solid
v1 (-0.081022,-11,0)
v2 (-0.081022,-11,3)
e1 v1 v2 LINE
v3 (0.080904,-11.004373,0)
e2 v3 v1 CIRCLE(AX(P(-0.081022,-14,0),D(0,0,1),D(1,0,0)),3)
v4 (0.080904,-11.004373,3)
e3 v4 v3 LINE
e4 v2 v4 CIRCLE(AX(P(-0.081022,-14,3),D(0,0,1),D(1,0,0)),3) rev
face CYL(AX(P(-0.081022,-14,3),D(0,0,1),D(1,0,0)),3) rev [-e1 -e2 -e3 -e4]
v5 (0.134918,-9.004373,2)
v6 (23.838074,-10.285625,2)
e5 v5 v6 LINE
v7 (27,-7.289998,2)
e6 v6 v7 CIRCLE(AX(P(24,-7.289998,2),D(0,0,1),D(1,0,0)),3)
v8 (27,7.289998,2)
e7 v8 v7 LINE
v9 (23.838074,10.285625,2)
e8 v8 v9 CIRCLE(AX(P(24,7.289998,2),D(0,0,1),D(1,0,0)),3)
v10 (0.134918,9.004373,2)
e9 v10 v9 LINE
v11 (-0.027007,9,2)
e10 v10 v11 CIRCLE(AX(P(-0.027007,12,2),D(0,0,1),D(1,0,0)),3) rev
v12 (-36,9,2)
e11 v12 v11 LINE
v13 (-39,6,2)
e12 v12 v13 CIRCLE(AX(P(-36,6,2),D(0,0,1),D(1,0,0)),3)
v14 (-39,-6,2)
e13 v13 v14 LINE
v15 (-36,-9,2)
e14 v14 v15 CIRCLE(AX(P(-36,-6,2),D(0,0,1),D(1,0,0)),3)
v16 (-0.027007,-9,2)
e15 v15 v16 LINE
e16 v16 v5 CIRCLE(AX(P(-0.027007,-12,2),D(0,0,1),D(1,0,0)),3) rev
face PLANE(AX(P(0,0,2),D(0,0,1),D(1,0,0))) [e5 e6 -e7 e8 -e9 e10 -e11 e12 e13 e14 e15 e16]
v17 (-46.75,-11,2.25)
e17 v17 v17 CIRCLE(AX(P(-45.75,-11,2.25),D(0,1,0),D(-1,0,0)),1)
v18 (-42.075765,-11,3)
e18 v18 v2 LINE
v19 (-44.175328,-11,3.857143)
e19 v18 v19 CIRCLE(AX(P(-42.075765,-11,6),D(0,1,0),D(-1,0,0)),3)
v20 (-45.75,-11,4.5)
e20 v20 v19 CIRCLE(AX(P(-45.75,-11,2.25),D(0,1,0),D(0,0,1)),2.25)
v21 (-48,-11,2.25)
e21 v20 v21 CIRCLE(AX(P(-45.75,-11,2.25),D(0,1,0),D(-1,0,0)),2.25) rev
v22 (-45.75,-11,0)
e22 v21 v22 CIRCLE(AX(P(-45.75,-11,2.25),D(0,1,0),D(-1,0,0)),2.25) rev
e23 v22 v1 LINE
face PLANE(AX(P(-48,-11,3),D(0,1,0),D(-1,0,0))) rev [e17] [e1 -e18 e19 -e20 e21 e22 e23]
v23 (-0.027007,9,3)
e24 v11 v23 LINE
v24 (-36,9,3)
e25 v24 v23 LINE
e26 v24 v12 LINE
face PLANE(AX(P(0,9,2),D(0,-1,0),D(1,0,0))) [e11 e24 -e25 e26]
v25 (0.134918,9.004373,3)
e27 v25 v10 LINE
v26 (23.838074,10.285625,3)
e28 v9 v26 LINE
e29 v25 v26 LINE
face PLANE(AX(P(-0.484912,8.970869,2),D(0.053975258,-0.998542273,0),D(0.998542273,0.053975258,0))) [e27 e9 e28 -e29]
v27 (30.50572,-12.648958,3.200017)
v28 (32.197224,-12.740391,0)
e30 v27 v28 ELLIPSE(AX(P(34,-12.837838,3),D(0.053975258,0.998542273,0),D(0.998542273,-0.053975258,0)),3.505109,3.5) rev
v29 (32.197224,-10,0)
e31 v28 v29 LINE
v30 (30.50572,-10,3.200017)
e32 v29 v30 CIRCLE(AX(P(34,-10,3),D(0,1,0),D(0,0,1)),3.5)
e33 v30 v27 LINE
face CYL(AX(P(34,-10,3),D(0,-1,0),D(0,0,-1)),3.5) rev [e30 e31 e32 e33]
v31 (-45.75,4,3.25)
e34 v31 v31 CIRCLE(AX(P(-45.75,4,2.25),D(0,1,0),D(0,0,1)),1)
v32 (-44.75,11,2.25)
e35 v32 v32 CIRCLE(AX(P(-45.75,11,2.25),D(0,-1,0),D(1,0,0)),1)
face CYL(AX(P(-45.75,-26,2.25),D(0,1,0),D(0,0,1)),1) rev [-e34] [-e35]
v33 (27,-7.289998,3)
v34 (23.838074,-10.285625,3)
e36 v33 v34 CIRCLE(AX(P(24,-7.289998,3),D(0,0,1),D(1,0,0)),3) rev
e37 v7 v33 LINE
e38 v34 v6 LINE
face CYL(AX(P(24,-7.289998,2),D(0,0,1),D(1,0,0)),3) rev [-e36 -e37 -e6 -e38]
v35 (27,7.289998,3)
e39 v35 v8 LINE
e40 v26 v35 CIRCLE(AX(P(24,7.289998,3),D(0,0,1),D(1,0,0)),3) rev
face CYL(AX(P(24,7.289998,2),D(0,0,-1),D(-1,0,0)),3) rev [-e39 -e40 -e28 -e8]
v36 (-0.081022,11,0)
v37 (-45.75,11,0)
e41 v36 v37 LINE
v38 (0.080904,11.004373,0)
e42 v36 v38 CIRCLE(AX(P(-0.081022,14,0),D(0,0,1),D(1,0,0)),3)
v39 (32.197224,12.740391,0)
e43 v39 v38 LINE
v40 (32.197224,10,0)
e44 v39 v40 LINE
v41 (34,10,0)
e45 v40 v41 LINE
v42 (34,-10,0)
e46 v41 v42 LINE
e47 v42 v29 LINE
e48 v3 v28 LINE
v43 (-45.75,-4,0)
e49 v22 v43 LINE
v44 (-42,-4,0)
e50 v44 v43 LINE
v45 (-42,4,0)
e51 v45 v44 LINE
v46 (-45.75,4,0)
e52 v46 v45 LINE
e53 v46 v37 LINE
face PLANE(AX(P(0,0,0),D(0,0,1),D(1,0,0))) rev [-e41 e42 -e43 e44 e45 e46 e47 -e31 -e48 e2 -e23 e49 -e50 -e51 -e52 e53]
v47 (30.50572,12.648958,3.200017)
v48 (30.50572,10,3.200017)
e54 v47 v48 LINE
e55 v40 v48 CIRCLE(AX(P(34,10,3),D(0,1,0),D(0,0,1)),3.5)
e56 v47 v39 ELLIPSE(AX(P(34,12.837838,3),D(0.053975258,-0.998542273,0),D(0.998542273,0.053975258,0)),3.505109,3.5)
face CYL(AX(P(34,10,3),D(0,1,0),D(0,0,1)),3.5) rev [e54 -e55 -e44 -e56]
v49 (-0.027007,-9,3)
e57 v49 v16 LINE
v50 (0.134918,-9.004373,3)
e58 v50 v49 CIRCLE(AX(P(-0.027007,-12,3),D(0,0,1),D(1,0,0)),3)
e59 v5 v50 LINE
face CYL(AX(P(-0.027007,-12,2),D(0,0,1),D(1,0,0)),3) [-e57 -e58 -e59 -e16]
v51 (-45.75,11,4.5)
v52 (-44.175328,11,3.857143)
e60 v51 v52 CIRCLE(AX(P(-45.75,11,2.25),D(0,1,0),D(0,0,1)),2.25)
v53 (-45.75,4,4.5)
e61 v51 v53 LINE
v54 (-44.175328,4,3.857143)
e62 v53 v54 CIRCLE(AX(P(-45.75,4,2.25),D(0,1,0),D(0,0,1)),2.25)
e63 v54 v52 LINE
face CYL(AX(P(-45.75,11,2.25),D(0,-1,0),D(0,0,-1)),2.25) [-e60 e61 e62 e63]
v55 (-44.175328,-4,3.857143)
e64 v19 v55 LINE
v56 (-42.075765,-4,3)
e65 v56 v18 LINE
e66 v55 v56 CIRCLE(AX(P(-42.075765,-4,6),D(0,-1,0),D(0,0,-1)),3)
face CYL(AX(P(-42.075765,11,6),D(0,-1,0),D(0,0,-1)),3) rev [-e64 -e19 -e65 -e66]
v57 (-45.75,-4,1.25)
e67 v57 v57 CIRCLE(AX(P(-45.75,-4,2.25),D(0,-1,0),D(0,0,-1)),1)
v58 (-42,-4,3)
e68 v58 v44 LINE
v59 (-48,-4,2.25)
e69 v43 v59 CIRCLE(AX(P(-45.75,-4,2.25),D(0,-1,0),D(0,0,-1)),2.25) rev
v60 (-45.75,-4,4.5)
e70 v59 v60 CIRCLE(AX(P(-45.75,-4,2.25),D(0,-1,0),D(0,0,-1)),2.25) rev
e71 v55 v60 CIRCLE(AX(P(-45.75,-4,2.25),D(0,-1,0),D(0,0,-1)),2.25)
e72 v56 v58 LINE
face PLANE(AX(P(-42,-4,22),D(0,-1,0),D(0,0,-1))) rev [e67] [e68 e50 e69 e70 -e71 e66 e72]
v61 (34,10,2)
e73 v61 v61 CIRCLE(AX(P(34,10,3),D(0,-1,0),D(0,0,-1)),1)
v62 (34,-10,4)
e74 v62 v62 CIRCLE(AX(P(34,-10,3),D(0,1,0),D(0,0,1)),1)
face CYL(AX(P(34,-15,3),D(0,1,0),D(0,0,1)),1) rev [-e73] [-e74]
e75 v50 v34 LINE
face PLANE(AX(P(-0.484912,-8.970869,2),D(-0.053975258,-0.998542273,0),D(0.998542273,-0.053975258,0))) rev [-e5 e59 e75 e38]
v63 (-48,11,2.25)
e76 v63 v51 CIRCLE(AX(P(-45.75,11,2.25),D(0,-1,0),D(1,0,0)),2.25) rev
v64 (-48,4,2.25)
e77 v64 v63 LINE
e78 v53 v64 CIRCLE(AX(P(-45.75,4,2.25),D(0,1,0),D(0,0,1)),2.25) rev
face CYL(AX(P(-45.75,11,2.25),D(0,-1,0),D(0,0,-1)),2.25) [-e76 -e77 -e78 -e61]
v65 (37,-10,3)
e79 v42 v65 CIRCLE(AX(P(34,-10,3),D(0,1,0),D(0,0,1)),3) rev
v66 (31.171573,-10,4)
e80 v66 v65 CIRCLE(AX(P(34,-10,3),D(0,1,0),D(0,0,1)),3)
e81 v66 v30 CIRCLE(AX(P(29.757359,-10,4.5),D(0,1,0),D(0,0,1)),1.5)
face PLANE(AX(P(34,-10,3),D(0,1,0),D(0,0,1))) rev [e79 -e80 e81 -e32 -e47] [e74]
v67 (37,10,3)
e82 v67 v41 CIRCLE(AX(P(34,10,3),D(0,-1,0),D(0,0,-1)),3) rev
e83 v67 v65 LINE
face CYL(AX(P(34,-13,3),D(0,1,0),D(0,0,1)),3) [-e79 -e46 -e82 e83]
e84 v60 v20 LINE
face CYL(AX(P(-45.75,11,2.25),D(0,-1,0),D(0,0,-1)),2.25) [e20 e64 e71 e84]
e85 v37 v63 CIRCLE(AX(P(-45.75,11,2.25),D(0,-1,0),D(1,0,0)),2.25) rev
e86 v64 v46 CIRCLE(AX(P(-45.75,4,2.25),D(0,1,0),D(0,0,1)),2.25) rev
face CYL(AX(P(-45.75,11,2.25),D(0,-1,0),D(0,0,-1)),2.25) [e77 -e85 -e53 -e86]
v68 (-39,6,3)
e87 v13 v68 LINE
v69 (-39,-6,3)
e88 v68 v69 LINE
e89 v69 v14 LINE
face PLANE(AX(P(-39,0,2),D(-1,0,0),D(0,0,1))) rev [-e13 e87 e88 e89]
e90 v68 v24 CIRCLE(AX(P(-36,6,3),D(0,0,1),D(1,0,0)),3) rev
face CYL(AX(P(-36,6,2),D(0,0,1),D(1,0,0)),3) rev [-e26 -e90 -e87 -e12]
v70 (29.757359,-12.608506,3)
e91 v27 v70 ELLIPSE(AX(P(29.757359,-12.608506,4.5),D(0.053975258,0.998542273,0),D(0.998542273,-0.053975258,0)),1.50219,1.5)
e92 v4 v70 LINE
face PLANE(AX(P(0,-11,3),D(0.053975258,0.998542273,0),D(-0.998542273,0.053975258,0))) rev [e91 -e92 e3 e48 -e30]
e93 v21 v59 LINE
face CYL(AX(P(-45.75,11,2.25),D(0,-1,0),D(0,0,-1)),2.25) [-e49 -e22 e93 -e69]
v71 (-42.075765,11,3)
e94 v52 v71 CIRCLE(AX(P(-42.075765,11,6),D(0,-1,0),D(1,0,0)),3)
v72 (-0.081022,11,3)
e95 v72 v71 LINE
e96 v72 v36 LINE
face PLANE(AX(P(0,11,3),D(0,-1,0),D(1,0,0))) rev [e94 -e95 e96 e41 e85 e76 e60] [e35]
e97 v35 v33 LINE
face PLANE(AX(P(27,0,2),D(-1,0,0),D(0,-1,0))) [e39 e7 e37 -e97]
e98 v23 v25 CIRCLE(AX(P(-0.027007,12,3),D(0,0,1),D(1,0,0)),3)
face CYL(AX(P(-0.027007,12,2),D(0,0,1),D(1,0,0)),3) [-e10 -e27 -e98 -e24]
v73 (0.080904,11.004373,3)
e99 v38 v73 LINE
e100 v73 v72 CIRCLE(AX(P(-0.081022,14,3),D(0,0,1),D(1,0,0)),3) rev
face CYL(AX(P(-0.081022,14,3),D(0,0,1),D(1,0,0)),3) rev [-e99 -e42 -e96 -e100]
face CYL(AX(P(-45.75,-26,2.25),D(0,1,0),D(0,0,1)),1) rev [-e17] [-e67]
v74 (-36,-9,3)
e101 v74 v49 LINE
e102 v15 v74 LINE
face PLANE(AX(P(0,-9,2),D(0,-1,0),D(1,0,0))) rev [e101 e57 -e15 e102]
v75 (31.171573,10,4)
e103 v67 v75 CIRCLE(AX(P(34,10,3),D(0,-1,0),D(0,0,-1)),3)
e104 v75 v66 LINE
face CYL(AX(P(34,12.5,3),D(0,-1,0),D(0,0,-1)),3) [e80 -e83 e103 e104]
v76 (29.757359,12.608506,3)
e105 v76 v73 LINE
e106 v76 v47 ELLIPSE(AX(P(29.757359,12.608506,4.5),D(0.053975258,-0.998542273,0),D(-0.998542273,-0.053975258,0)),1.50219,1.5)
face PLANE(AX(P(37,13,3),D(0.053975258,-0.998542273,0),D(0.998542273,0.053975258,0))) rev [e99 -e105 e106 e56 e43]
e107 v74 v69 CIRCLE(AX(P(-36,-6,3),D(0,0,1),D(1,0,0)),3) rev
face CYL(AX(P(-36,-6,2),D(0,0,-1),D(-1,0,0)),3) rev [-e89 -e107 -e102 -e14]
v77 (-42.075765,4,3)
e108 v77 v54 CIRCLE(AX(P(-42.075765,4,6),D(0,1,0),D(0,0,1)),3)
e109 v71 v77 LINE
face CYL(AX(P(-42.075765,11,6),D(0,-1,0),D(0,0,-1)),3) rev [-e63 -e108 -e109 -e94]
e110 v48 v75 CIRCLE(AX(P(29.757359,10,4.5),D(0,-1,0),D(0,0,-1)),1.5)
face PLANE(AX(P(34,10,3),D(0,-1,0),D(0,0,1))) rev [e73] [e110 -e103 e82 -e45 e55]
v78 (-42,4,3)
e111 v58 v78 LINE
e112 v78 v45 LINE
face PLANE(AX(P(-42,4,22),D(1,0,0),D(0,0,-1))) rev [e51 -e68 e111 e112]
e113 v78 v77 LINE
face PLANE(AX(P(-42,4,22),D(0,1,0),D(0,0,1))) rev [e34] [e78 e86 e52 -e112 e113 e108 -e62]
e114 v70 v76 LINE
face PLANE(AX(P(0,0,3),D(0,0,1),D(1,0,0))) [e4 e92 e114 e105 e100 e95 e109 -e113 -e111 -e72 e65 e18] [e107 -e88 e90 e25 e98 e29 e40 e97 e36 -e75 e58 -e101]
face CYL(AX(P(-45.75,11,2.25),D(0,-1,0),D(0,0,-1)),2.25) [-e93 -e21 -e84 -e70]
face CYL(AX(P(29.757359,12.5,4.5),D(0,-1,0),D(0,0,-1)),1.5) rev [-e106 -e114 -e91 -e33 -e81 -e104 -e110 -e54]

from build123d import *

# Parameters (mm, degrees)
SALIENTE_EXTRUIR1_DEPTH = 3
CORTAR_EXTRUIR1_DEPTH   = 1
CROQUIS8_R              = 3
SALIENTE_EXTRUIR2_DEPTH = 12.5
REDONDEO1_R             = 3
CROQUIS9_R              = 3.5
CORTAR_EXTRUIR3_DEPTH   = 3
REDONDEO2_R             = 1.5
CROQUIS10_R             = 1
CORTAR_EXTRUIR4_DEPTH   = 15
REDONDEO3_R             = 3
SALIENTE_EXTRUIR3_DEPTH = 11
REDONDEO4_R             = 2.25
CROQUIS12_W             = 10
CROQUIS12_H             = 8
CORTAR_EXTRUIR5_DEPTH   = 22
CROQUIS13_R             = 1
CORTAR_EXTRUIR6_DEPTH   = 26
REDONDEO5_R             = 3
REDONDEO6_R             = 3


# Some blends are built 0.0001 mm under size
with BuildPart() as part:
    # Croquis1 → Saliente-Extruir1 (new body)
    with BuildSketch(Plane.XY):
        Polygon((0, 11), (-48, 11), (-48, -11), (0, -11), (37, -13), (37, 13), align=None)
    extrude(amount=SALIENTE_EXTRUIR1_DEPTH)

    # Croquis7 → Cortar-Extruir1 (cut)
    with BuildSketch(Plane.XY.offset(3)):
        Polygon((-39, 9), (-39, -9), (0.054014627, -9), (27, -10.45653975), (27, 10.45653975), (0.054014627, 9), align=None)
    extrude(amount=-CORTAR_EXTRUIR1_DEPTH, mode=Mode.SUBTRACT)

    # Croquis8 → Saliente-Extruir2 (add, symmetric)
    with BuildSketch(Plane(origin=(0, 0, 0), x_dir=(1, 0, 0), z_dir=(0, 1, 0))):
        with Locations((34, -3)):
            Circle(CROQUIS8_R)
    extrude(amount=SALIENTE_EXTRUIR2_DEPTH, both=True)

    # Redondeo1
    redondeo1_edges = [part.edges().sort_by_distance(p)[0] for p in [
        (37, 0, 0),
    ]]
    fillet(redondeo1_edges, radius=REDONDEO1_R - 0.0001)  # a hair under: the kernel refuses the full size

    # Croquis9 → Cortar-Extruir3 (cut)
    with BuildSketch(Plane(origin=(0, -13, 0), x_dir=(1, 0, 0), z_dir=(0, 1, 0))):
        with Locations((34, -3)):
            Circle(CROQUIS9_R)
    cortar_extruir3 = extrude(amount=CORTAR_EXTRUIR3_DEPTH, mode=Mode.SUBTRACT)

    # Simetría1: Cortar-Extruir3 across plane
    add(cortar_extruir3.mirror(Plane.ZX), mode=Mode.SUBTRACT)

    # Redondeo2
    redondeo2_edges = [part.edges().sort_by_distance(p)[0] for p in [
        (31, 0, 3),
    ]]
    fillet(redondeo2_edges, radius=REDONDEO2_R)

    # Croquis10 → Cortar-Extruir4 (cut, symmetric)
    with BuildSketch(Plane(origin=(0, 0, 0), x_dir=(1, 0, 0), z_dir=(0, 1, 0))):
        with Locations(Location((34, -3, 0), (0, 0, 270))):
            Circle(CROQUIS10_R)
    extrude(amount=CORTAR_EXTRUIR4_DEPTH, both=True, mode=Mode.SUBTRACT)

    # Redondeo3
    # the kernel refuses this fillet: 3 mm, written as the material it adds along each edge
    with BuildSketch(Plane(origin=(-39, -9, 3), x_dir=(0, 1, 0), z_dir=(0, 0, -1))) as redondeo3_piece_1:
        with BuildLine():
            CenterArc((REDONDEO3_R, REDONDEO3_R), REDONDEO3_R, 180, 90)
            Line((0, REDONDEO3_R), (0, 0))
            Line((0, 0), (REDONDEO3_R, 0))
        make_face()
    extrude(amount=1)
    with BuildSketch(Plane(origin=(-39, 9, 3), x_dir=(0, -1, 0), z_dir=(0, 0, -1))) as redondeo3_piece_2:
        with BuildLine():
            CenterArc((REDONDEO3_R, -REDONDEO3_R), REDONDEO3_R, 90, 90)
            Line((0, -REDONDEO3_R), (0, 0))
            Line((0, 0), (REDONDEO3_R, 0))
        make_face()
    extrude(amount=1)
    with BuildSketch(Plane(origin=(27, 10.45653975, 3), x_dir=(-0.9985422732775083, -0.053975258015000575, 0), z_dir=(0, 0, -1))) as redondeo3_piece_3:
        with BuildLine():
            CenterArc((REDONDEO3_R * 1.05551390885, -REDONDEO3_R), REDONDEO3_R, 90, 93.094058059)
            Line((REDONDEO3_R * 0.0569716355684, -REDONDEO3_R * 1.05397525801), (0, 0))
            Line((0, 0), (REDONDEO3_R * 1.05551390885, 0))
        make_face()
    extrude(amount=1)
    with BuildSketch(Plane(origin=(27, -10.45653975, 3), x_dir=(-0.9985422732775082, 0.053975258015002685, 0), z_dir=(0, 0, -1))) as redondeo3_piece_4:
        with BuildLine():
            CenterArc((REDONDEO3_R * 1.05551390885, REDONDEO3_R), REDONDEO3_R, 176.905941941, 93.094058059)
            Line((REDONDEO3_R * 0.0569716355684, REDONDEO3_R * 1.05397525802), (0, 0))
            Line((0, 0), (REDONDEO3_R * 1.05551390885, 0))
        make_face()
    extrude(amount=1)
    # the kernel refuses this fillet: 3 mm, written as the material it takes off along each edge
    with BuildSketch(Plane(origin=(0.054014627, 9, 3.202554852), x_dir=(-1, 0, 0), z_dir=(0, 0, -1))) as redondeo3_2_piece_1:
        with BuildLine():
            CenterArc((REDONDEO3_R * 0.0270073136489, REDONDEO3_R), REDONDEO3_R, 266.905941941, 3.094058059)
            Line((-REDONDEO3_R * 0.0269679443661, REDONDEO3_R * 0.00145772672249), (0, 0))
            Line((0, 0), (REDONDEO3_R * 0.0270073136489, 0))
        make_face()
    extrude(amount=1.202554852, mode=Mode.SUBTRACT)
    with BuildSketch(Plane(origin=(0.054014627, -9, 3.202554852), x_dir=(-1, 0, 0), z_dir=(0, 0, -1))) as redondeo3_2_piece_2:
        with BuildLine():
            CenterArc((REDONDEO3_R * 0.0270073136489, -REDONDEO3_R), REDONDEO3_R, 90, 3.094058059)
            Line((-REDONDEO3_R * 0.0269679443661, -REDONDEO3_R * 0.00145772672249), (0, 0))
            Line((0, 0), (REDONDEO3_R * 0.0270073136489, 0))
        make_face()
    extrude(amount=1.202554852, mode=Mode.SUBTRACT)

    # Croquis11 → Saliente-Extruir3 (add, symmetric)
    with BuildSketch(Plane(origin=(0, 0, 0), x_dir=(1, 0, 0), z_dir=(0, 1, 0))):
        with BuildLine():
            Line((-48, -4.5), (-45.75, -4.5))
            ThreePointArc((-45.75, -4.5), (-44.159009742, -3.840990258), (-43.5, -2.25))
            Line((-43.5, -2.25), (-43.5, 0))
            Line((-43.5, 0), (-48, 0))
            Line((-48, 0), (-48, -4.5))
        make_face()
    extrude(amount=SALIENTE_EXTRUIR3_DEPTH, both=True)

    # Redondeo4
    redondeo4_edges = [part.edges().sort_by_distance(p)[0] for p in [
        (-48, 0, 0),
        (-48, 0, 4.5),
    ]]
    fillet(redondeo4_edges, radius=REDONDEO4_R - 0.0001)  # a hair under: the kernel refuses the full size

    # Croquis12 → Cortar-Extruir5 (cut)
    with BuildSketch(Plane(origin=(0, 0, 0), x_dir=(-1, 0, 0), z_dir=(0, 0, -1))):
        with Locations((47, 0)):
            Rectangle(CROQUIS12_W, CROQUIS12_H)
    extrude(amount=-CORTAR_EXTRUIR5_DEPTH, mode=Mode.SUBTRACT)

    # Croquis13 → Cortar-Extruir6 (cut, symmetric)
    with BuildSketch(Plane(origin=(0, 0, 0), x_dir=(1, 0, 0), z_dir=(0, 1, 0))):
        with Locations(Location((-45.75, -2.25, 0), (0, 0, 180))):
            Circle(CROQUIS13_R)
    extrude(amount=CORTAR_EXTRUIR6_DEPTH, both=True, mode=Mode.SUBTRACT)

    # Redondeo5
    redondeo5_edges = [part.edges().sort_by_distance(p)[0] for p in [
        (-43.628679656, 7.5, 3),
        (-43.628679656, -7.5, 3),
    ]]
    fillet(redondeo5_edges, radius=REDONDEO5_R)

    # Redondeo6
    # the kernel refuses this fillet: 3 mm, written as the material it adds along each edge
    with BuildSketch(Plane(origin=(0, 11, 0), x_dir=(-1, 0, 0), z_dir=(0, 0, 1))) as redondeo6_piece_1:
        with BuildLine():
            CenterArc((REDONDEO6_R * 0.0270073136489, -REDONDEO6_R), REDONDEO6_R, 90, 3.094058059)
            Line((-REDONDEO6_R * 0.0269679443661, -REDONDEO6_R * 0.00145772672249), (0, 0))
            Line((0, 0), (REDONDEO6_R * 0.0270073136489, 0))
        make_face()
    extrude(amount=3)
    with BuildSketch(Plane(origin=(0, -11, 0), x_dir=(-1, 0, 0), z_dir=(0, 0, 1))) as redondeo6_piece_2:
        with BuildLine():
            CenterArc((REDONDEO6_R * 0.0270073136489, REDONDEO6_R), REDONDEO6_R, 266.905941941, 3.094058059)
            Line((-REDONDEO6_R * 0.0269679443661, REDONDEO6_R * 0.00145772672249), (0, 0))
            Line((0, 0), (REDONDEO6_R * 0.0270073136489, 0))
        make_face()
    extrude(amount=3)


solid = part.part
